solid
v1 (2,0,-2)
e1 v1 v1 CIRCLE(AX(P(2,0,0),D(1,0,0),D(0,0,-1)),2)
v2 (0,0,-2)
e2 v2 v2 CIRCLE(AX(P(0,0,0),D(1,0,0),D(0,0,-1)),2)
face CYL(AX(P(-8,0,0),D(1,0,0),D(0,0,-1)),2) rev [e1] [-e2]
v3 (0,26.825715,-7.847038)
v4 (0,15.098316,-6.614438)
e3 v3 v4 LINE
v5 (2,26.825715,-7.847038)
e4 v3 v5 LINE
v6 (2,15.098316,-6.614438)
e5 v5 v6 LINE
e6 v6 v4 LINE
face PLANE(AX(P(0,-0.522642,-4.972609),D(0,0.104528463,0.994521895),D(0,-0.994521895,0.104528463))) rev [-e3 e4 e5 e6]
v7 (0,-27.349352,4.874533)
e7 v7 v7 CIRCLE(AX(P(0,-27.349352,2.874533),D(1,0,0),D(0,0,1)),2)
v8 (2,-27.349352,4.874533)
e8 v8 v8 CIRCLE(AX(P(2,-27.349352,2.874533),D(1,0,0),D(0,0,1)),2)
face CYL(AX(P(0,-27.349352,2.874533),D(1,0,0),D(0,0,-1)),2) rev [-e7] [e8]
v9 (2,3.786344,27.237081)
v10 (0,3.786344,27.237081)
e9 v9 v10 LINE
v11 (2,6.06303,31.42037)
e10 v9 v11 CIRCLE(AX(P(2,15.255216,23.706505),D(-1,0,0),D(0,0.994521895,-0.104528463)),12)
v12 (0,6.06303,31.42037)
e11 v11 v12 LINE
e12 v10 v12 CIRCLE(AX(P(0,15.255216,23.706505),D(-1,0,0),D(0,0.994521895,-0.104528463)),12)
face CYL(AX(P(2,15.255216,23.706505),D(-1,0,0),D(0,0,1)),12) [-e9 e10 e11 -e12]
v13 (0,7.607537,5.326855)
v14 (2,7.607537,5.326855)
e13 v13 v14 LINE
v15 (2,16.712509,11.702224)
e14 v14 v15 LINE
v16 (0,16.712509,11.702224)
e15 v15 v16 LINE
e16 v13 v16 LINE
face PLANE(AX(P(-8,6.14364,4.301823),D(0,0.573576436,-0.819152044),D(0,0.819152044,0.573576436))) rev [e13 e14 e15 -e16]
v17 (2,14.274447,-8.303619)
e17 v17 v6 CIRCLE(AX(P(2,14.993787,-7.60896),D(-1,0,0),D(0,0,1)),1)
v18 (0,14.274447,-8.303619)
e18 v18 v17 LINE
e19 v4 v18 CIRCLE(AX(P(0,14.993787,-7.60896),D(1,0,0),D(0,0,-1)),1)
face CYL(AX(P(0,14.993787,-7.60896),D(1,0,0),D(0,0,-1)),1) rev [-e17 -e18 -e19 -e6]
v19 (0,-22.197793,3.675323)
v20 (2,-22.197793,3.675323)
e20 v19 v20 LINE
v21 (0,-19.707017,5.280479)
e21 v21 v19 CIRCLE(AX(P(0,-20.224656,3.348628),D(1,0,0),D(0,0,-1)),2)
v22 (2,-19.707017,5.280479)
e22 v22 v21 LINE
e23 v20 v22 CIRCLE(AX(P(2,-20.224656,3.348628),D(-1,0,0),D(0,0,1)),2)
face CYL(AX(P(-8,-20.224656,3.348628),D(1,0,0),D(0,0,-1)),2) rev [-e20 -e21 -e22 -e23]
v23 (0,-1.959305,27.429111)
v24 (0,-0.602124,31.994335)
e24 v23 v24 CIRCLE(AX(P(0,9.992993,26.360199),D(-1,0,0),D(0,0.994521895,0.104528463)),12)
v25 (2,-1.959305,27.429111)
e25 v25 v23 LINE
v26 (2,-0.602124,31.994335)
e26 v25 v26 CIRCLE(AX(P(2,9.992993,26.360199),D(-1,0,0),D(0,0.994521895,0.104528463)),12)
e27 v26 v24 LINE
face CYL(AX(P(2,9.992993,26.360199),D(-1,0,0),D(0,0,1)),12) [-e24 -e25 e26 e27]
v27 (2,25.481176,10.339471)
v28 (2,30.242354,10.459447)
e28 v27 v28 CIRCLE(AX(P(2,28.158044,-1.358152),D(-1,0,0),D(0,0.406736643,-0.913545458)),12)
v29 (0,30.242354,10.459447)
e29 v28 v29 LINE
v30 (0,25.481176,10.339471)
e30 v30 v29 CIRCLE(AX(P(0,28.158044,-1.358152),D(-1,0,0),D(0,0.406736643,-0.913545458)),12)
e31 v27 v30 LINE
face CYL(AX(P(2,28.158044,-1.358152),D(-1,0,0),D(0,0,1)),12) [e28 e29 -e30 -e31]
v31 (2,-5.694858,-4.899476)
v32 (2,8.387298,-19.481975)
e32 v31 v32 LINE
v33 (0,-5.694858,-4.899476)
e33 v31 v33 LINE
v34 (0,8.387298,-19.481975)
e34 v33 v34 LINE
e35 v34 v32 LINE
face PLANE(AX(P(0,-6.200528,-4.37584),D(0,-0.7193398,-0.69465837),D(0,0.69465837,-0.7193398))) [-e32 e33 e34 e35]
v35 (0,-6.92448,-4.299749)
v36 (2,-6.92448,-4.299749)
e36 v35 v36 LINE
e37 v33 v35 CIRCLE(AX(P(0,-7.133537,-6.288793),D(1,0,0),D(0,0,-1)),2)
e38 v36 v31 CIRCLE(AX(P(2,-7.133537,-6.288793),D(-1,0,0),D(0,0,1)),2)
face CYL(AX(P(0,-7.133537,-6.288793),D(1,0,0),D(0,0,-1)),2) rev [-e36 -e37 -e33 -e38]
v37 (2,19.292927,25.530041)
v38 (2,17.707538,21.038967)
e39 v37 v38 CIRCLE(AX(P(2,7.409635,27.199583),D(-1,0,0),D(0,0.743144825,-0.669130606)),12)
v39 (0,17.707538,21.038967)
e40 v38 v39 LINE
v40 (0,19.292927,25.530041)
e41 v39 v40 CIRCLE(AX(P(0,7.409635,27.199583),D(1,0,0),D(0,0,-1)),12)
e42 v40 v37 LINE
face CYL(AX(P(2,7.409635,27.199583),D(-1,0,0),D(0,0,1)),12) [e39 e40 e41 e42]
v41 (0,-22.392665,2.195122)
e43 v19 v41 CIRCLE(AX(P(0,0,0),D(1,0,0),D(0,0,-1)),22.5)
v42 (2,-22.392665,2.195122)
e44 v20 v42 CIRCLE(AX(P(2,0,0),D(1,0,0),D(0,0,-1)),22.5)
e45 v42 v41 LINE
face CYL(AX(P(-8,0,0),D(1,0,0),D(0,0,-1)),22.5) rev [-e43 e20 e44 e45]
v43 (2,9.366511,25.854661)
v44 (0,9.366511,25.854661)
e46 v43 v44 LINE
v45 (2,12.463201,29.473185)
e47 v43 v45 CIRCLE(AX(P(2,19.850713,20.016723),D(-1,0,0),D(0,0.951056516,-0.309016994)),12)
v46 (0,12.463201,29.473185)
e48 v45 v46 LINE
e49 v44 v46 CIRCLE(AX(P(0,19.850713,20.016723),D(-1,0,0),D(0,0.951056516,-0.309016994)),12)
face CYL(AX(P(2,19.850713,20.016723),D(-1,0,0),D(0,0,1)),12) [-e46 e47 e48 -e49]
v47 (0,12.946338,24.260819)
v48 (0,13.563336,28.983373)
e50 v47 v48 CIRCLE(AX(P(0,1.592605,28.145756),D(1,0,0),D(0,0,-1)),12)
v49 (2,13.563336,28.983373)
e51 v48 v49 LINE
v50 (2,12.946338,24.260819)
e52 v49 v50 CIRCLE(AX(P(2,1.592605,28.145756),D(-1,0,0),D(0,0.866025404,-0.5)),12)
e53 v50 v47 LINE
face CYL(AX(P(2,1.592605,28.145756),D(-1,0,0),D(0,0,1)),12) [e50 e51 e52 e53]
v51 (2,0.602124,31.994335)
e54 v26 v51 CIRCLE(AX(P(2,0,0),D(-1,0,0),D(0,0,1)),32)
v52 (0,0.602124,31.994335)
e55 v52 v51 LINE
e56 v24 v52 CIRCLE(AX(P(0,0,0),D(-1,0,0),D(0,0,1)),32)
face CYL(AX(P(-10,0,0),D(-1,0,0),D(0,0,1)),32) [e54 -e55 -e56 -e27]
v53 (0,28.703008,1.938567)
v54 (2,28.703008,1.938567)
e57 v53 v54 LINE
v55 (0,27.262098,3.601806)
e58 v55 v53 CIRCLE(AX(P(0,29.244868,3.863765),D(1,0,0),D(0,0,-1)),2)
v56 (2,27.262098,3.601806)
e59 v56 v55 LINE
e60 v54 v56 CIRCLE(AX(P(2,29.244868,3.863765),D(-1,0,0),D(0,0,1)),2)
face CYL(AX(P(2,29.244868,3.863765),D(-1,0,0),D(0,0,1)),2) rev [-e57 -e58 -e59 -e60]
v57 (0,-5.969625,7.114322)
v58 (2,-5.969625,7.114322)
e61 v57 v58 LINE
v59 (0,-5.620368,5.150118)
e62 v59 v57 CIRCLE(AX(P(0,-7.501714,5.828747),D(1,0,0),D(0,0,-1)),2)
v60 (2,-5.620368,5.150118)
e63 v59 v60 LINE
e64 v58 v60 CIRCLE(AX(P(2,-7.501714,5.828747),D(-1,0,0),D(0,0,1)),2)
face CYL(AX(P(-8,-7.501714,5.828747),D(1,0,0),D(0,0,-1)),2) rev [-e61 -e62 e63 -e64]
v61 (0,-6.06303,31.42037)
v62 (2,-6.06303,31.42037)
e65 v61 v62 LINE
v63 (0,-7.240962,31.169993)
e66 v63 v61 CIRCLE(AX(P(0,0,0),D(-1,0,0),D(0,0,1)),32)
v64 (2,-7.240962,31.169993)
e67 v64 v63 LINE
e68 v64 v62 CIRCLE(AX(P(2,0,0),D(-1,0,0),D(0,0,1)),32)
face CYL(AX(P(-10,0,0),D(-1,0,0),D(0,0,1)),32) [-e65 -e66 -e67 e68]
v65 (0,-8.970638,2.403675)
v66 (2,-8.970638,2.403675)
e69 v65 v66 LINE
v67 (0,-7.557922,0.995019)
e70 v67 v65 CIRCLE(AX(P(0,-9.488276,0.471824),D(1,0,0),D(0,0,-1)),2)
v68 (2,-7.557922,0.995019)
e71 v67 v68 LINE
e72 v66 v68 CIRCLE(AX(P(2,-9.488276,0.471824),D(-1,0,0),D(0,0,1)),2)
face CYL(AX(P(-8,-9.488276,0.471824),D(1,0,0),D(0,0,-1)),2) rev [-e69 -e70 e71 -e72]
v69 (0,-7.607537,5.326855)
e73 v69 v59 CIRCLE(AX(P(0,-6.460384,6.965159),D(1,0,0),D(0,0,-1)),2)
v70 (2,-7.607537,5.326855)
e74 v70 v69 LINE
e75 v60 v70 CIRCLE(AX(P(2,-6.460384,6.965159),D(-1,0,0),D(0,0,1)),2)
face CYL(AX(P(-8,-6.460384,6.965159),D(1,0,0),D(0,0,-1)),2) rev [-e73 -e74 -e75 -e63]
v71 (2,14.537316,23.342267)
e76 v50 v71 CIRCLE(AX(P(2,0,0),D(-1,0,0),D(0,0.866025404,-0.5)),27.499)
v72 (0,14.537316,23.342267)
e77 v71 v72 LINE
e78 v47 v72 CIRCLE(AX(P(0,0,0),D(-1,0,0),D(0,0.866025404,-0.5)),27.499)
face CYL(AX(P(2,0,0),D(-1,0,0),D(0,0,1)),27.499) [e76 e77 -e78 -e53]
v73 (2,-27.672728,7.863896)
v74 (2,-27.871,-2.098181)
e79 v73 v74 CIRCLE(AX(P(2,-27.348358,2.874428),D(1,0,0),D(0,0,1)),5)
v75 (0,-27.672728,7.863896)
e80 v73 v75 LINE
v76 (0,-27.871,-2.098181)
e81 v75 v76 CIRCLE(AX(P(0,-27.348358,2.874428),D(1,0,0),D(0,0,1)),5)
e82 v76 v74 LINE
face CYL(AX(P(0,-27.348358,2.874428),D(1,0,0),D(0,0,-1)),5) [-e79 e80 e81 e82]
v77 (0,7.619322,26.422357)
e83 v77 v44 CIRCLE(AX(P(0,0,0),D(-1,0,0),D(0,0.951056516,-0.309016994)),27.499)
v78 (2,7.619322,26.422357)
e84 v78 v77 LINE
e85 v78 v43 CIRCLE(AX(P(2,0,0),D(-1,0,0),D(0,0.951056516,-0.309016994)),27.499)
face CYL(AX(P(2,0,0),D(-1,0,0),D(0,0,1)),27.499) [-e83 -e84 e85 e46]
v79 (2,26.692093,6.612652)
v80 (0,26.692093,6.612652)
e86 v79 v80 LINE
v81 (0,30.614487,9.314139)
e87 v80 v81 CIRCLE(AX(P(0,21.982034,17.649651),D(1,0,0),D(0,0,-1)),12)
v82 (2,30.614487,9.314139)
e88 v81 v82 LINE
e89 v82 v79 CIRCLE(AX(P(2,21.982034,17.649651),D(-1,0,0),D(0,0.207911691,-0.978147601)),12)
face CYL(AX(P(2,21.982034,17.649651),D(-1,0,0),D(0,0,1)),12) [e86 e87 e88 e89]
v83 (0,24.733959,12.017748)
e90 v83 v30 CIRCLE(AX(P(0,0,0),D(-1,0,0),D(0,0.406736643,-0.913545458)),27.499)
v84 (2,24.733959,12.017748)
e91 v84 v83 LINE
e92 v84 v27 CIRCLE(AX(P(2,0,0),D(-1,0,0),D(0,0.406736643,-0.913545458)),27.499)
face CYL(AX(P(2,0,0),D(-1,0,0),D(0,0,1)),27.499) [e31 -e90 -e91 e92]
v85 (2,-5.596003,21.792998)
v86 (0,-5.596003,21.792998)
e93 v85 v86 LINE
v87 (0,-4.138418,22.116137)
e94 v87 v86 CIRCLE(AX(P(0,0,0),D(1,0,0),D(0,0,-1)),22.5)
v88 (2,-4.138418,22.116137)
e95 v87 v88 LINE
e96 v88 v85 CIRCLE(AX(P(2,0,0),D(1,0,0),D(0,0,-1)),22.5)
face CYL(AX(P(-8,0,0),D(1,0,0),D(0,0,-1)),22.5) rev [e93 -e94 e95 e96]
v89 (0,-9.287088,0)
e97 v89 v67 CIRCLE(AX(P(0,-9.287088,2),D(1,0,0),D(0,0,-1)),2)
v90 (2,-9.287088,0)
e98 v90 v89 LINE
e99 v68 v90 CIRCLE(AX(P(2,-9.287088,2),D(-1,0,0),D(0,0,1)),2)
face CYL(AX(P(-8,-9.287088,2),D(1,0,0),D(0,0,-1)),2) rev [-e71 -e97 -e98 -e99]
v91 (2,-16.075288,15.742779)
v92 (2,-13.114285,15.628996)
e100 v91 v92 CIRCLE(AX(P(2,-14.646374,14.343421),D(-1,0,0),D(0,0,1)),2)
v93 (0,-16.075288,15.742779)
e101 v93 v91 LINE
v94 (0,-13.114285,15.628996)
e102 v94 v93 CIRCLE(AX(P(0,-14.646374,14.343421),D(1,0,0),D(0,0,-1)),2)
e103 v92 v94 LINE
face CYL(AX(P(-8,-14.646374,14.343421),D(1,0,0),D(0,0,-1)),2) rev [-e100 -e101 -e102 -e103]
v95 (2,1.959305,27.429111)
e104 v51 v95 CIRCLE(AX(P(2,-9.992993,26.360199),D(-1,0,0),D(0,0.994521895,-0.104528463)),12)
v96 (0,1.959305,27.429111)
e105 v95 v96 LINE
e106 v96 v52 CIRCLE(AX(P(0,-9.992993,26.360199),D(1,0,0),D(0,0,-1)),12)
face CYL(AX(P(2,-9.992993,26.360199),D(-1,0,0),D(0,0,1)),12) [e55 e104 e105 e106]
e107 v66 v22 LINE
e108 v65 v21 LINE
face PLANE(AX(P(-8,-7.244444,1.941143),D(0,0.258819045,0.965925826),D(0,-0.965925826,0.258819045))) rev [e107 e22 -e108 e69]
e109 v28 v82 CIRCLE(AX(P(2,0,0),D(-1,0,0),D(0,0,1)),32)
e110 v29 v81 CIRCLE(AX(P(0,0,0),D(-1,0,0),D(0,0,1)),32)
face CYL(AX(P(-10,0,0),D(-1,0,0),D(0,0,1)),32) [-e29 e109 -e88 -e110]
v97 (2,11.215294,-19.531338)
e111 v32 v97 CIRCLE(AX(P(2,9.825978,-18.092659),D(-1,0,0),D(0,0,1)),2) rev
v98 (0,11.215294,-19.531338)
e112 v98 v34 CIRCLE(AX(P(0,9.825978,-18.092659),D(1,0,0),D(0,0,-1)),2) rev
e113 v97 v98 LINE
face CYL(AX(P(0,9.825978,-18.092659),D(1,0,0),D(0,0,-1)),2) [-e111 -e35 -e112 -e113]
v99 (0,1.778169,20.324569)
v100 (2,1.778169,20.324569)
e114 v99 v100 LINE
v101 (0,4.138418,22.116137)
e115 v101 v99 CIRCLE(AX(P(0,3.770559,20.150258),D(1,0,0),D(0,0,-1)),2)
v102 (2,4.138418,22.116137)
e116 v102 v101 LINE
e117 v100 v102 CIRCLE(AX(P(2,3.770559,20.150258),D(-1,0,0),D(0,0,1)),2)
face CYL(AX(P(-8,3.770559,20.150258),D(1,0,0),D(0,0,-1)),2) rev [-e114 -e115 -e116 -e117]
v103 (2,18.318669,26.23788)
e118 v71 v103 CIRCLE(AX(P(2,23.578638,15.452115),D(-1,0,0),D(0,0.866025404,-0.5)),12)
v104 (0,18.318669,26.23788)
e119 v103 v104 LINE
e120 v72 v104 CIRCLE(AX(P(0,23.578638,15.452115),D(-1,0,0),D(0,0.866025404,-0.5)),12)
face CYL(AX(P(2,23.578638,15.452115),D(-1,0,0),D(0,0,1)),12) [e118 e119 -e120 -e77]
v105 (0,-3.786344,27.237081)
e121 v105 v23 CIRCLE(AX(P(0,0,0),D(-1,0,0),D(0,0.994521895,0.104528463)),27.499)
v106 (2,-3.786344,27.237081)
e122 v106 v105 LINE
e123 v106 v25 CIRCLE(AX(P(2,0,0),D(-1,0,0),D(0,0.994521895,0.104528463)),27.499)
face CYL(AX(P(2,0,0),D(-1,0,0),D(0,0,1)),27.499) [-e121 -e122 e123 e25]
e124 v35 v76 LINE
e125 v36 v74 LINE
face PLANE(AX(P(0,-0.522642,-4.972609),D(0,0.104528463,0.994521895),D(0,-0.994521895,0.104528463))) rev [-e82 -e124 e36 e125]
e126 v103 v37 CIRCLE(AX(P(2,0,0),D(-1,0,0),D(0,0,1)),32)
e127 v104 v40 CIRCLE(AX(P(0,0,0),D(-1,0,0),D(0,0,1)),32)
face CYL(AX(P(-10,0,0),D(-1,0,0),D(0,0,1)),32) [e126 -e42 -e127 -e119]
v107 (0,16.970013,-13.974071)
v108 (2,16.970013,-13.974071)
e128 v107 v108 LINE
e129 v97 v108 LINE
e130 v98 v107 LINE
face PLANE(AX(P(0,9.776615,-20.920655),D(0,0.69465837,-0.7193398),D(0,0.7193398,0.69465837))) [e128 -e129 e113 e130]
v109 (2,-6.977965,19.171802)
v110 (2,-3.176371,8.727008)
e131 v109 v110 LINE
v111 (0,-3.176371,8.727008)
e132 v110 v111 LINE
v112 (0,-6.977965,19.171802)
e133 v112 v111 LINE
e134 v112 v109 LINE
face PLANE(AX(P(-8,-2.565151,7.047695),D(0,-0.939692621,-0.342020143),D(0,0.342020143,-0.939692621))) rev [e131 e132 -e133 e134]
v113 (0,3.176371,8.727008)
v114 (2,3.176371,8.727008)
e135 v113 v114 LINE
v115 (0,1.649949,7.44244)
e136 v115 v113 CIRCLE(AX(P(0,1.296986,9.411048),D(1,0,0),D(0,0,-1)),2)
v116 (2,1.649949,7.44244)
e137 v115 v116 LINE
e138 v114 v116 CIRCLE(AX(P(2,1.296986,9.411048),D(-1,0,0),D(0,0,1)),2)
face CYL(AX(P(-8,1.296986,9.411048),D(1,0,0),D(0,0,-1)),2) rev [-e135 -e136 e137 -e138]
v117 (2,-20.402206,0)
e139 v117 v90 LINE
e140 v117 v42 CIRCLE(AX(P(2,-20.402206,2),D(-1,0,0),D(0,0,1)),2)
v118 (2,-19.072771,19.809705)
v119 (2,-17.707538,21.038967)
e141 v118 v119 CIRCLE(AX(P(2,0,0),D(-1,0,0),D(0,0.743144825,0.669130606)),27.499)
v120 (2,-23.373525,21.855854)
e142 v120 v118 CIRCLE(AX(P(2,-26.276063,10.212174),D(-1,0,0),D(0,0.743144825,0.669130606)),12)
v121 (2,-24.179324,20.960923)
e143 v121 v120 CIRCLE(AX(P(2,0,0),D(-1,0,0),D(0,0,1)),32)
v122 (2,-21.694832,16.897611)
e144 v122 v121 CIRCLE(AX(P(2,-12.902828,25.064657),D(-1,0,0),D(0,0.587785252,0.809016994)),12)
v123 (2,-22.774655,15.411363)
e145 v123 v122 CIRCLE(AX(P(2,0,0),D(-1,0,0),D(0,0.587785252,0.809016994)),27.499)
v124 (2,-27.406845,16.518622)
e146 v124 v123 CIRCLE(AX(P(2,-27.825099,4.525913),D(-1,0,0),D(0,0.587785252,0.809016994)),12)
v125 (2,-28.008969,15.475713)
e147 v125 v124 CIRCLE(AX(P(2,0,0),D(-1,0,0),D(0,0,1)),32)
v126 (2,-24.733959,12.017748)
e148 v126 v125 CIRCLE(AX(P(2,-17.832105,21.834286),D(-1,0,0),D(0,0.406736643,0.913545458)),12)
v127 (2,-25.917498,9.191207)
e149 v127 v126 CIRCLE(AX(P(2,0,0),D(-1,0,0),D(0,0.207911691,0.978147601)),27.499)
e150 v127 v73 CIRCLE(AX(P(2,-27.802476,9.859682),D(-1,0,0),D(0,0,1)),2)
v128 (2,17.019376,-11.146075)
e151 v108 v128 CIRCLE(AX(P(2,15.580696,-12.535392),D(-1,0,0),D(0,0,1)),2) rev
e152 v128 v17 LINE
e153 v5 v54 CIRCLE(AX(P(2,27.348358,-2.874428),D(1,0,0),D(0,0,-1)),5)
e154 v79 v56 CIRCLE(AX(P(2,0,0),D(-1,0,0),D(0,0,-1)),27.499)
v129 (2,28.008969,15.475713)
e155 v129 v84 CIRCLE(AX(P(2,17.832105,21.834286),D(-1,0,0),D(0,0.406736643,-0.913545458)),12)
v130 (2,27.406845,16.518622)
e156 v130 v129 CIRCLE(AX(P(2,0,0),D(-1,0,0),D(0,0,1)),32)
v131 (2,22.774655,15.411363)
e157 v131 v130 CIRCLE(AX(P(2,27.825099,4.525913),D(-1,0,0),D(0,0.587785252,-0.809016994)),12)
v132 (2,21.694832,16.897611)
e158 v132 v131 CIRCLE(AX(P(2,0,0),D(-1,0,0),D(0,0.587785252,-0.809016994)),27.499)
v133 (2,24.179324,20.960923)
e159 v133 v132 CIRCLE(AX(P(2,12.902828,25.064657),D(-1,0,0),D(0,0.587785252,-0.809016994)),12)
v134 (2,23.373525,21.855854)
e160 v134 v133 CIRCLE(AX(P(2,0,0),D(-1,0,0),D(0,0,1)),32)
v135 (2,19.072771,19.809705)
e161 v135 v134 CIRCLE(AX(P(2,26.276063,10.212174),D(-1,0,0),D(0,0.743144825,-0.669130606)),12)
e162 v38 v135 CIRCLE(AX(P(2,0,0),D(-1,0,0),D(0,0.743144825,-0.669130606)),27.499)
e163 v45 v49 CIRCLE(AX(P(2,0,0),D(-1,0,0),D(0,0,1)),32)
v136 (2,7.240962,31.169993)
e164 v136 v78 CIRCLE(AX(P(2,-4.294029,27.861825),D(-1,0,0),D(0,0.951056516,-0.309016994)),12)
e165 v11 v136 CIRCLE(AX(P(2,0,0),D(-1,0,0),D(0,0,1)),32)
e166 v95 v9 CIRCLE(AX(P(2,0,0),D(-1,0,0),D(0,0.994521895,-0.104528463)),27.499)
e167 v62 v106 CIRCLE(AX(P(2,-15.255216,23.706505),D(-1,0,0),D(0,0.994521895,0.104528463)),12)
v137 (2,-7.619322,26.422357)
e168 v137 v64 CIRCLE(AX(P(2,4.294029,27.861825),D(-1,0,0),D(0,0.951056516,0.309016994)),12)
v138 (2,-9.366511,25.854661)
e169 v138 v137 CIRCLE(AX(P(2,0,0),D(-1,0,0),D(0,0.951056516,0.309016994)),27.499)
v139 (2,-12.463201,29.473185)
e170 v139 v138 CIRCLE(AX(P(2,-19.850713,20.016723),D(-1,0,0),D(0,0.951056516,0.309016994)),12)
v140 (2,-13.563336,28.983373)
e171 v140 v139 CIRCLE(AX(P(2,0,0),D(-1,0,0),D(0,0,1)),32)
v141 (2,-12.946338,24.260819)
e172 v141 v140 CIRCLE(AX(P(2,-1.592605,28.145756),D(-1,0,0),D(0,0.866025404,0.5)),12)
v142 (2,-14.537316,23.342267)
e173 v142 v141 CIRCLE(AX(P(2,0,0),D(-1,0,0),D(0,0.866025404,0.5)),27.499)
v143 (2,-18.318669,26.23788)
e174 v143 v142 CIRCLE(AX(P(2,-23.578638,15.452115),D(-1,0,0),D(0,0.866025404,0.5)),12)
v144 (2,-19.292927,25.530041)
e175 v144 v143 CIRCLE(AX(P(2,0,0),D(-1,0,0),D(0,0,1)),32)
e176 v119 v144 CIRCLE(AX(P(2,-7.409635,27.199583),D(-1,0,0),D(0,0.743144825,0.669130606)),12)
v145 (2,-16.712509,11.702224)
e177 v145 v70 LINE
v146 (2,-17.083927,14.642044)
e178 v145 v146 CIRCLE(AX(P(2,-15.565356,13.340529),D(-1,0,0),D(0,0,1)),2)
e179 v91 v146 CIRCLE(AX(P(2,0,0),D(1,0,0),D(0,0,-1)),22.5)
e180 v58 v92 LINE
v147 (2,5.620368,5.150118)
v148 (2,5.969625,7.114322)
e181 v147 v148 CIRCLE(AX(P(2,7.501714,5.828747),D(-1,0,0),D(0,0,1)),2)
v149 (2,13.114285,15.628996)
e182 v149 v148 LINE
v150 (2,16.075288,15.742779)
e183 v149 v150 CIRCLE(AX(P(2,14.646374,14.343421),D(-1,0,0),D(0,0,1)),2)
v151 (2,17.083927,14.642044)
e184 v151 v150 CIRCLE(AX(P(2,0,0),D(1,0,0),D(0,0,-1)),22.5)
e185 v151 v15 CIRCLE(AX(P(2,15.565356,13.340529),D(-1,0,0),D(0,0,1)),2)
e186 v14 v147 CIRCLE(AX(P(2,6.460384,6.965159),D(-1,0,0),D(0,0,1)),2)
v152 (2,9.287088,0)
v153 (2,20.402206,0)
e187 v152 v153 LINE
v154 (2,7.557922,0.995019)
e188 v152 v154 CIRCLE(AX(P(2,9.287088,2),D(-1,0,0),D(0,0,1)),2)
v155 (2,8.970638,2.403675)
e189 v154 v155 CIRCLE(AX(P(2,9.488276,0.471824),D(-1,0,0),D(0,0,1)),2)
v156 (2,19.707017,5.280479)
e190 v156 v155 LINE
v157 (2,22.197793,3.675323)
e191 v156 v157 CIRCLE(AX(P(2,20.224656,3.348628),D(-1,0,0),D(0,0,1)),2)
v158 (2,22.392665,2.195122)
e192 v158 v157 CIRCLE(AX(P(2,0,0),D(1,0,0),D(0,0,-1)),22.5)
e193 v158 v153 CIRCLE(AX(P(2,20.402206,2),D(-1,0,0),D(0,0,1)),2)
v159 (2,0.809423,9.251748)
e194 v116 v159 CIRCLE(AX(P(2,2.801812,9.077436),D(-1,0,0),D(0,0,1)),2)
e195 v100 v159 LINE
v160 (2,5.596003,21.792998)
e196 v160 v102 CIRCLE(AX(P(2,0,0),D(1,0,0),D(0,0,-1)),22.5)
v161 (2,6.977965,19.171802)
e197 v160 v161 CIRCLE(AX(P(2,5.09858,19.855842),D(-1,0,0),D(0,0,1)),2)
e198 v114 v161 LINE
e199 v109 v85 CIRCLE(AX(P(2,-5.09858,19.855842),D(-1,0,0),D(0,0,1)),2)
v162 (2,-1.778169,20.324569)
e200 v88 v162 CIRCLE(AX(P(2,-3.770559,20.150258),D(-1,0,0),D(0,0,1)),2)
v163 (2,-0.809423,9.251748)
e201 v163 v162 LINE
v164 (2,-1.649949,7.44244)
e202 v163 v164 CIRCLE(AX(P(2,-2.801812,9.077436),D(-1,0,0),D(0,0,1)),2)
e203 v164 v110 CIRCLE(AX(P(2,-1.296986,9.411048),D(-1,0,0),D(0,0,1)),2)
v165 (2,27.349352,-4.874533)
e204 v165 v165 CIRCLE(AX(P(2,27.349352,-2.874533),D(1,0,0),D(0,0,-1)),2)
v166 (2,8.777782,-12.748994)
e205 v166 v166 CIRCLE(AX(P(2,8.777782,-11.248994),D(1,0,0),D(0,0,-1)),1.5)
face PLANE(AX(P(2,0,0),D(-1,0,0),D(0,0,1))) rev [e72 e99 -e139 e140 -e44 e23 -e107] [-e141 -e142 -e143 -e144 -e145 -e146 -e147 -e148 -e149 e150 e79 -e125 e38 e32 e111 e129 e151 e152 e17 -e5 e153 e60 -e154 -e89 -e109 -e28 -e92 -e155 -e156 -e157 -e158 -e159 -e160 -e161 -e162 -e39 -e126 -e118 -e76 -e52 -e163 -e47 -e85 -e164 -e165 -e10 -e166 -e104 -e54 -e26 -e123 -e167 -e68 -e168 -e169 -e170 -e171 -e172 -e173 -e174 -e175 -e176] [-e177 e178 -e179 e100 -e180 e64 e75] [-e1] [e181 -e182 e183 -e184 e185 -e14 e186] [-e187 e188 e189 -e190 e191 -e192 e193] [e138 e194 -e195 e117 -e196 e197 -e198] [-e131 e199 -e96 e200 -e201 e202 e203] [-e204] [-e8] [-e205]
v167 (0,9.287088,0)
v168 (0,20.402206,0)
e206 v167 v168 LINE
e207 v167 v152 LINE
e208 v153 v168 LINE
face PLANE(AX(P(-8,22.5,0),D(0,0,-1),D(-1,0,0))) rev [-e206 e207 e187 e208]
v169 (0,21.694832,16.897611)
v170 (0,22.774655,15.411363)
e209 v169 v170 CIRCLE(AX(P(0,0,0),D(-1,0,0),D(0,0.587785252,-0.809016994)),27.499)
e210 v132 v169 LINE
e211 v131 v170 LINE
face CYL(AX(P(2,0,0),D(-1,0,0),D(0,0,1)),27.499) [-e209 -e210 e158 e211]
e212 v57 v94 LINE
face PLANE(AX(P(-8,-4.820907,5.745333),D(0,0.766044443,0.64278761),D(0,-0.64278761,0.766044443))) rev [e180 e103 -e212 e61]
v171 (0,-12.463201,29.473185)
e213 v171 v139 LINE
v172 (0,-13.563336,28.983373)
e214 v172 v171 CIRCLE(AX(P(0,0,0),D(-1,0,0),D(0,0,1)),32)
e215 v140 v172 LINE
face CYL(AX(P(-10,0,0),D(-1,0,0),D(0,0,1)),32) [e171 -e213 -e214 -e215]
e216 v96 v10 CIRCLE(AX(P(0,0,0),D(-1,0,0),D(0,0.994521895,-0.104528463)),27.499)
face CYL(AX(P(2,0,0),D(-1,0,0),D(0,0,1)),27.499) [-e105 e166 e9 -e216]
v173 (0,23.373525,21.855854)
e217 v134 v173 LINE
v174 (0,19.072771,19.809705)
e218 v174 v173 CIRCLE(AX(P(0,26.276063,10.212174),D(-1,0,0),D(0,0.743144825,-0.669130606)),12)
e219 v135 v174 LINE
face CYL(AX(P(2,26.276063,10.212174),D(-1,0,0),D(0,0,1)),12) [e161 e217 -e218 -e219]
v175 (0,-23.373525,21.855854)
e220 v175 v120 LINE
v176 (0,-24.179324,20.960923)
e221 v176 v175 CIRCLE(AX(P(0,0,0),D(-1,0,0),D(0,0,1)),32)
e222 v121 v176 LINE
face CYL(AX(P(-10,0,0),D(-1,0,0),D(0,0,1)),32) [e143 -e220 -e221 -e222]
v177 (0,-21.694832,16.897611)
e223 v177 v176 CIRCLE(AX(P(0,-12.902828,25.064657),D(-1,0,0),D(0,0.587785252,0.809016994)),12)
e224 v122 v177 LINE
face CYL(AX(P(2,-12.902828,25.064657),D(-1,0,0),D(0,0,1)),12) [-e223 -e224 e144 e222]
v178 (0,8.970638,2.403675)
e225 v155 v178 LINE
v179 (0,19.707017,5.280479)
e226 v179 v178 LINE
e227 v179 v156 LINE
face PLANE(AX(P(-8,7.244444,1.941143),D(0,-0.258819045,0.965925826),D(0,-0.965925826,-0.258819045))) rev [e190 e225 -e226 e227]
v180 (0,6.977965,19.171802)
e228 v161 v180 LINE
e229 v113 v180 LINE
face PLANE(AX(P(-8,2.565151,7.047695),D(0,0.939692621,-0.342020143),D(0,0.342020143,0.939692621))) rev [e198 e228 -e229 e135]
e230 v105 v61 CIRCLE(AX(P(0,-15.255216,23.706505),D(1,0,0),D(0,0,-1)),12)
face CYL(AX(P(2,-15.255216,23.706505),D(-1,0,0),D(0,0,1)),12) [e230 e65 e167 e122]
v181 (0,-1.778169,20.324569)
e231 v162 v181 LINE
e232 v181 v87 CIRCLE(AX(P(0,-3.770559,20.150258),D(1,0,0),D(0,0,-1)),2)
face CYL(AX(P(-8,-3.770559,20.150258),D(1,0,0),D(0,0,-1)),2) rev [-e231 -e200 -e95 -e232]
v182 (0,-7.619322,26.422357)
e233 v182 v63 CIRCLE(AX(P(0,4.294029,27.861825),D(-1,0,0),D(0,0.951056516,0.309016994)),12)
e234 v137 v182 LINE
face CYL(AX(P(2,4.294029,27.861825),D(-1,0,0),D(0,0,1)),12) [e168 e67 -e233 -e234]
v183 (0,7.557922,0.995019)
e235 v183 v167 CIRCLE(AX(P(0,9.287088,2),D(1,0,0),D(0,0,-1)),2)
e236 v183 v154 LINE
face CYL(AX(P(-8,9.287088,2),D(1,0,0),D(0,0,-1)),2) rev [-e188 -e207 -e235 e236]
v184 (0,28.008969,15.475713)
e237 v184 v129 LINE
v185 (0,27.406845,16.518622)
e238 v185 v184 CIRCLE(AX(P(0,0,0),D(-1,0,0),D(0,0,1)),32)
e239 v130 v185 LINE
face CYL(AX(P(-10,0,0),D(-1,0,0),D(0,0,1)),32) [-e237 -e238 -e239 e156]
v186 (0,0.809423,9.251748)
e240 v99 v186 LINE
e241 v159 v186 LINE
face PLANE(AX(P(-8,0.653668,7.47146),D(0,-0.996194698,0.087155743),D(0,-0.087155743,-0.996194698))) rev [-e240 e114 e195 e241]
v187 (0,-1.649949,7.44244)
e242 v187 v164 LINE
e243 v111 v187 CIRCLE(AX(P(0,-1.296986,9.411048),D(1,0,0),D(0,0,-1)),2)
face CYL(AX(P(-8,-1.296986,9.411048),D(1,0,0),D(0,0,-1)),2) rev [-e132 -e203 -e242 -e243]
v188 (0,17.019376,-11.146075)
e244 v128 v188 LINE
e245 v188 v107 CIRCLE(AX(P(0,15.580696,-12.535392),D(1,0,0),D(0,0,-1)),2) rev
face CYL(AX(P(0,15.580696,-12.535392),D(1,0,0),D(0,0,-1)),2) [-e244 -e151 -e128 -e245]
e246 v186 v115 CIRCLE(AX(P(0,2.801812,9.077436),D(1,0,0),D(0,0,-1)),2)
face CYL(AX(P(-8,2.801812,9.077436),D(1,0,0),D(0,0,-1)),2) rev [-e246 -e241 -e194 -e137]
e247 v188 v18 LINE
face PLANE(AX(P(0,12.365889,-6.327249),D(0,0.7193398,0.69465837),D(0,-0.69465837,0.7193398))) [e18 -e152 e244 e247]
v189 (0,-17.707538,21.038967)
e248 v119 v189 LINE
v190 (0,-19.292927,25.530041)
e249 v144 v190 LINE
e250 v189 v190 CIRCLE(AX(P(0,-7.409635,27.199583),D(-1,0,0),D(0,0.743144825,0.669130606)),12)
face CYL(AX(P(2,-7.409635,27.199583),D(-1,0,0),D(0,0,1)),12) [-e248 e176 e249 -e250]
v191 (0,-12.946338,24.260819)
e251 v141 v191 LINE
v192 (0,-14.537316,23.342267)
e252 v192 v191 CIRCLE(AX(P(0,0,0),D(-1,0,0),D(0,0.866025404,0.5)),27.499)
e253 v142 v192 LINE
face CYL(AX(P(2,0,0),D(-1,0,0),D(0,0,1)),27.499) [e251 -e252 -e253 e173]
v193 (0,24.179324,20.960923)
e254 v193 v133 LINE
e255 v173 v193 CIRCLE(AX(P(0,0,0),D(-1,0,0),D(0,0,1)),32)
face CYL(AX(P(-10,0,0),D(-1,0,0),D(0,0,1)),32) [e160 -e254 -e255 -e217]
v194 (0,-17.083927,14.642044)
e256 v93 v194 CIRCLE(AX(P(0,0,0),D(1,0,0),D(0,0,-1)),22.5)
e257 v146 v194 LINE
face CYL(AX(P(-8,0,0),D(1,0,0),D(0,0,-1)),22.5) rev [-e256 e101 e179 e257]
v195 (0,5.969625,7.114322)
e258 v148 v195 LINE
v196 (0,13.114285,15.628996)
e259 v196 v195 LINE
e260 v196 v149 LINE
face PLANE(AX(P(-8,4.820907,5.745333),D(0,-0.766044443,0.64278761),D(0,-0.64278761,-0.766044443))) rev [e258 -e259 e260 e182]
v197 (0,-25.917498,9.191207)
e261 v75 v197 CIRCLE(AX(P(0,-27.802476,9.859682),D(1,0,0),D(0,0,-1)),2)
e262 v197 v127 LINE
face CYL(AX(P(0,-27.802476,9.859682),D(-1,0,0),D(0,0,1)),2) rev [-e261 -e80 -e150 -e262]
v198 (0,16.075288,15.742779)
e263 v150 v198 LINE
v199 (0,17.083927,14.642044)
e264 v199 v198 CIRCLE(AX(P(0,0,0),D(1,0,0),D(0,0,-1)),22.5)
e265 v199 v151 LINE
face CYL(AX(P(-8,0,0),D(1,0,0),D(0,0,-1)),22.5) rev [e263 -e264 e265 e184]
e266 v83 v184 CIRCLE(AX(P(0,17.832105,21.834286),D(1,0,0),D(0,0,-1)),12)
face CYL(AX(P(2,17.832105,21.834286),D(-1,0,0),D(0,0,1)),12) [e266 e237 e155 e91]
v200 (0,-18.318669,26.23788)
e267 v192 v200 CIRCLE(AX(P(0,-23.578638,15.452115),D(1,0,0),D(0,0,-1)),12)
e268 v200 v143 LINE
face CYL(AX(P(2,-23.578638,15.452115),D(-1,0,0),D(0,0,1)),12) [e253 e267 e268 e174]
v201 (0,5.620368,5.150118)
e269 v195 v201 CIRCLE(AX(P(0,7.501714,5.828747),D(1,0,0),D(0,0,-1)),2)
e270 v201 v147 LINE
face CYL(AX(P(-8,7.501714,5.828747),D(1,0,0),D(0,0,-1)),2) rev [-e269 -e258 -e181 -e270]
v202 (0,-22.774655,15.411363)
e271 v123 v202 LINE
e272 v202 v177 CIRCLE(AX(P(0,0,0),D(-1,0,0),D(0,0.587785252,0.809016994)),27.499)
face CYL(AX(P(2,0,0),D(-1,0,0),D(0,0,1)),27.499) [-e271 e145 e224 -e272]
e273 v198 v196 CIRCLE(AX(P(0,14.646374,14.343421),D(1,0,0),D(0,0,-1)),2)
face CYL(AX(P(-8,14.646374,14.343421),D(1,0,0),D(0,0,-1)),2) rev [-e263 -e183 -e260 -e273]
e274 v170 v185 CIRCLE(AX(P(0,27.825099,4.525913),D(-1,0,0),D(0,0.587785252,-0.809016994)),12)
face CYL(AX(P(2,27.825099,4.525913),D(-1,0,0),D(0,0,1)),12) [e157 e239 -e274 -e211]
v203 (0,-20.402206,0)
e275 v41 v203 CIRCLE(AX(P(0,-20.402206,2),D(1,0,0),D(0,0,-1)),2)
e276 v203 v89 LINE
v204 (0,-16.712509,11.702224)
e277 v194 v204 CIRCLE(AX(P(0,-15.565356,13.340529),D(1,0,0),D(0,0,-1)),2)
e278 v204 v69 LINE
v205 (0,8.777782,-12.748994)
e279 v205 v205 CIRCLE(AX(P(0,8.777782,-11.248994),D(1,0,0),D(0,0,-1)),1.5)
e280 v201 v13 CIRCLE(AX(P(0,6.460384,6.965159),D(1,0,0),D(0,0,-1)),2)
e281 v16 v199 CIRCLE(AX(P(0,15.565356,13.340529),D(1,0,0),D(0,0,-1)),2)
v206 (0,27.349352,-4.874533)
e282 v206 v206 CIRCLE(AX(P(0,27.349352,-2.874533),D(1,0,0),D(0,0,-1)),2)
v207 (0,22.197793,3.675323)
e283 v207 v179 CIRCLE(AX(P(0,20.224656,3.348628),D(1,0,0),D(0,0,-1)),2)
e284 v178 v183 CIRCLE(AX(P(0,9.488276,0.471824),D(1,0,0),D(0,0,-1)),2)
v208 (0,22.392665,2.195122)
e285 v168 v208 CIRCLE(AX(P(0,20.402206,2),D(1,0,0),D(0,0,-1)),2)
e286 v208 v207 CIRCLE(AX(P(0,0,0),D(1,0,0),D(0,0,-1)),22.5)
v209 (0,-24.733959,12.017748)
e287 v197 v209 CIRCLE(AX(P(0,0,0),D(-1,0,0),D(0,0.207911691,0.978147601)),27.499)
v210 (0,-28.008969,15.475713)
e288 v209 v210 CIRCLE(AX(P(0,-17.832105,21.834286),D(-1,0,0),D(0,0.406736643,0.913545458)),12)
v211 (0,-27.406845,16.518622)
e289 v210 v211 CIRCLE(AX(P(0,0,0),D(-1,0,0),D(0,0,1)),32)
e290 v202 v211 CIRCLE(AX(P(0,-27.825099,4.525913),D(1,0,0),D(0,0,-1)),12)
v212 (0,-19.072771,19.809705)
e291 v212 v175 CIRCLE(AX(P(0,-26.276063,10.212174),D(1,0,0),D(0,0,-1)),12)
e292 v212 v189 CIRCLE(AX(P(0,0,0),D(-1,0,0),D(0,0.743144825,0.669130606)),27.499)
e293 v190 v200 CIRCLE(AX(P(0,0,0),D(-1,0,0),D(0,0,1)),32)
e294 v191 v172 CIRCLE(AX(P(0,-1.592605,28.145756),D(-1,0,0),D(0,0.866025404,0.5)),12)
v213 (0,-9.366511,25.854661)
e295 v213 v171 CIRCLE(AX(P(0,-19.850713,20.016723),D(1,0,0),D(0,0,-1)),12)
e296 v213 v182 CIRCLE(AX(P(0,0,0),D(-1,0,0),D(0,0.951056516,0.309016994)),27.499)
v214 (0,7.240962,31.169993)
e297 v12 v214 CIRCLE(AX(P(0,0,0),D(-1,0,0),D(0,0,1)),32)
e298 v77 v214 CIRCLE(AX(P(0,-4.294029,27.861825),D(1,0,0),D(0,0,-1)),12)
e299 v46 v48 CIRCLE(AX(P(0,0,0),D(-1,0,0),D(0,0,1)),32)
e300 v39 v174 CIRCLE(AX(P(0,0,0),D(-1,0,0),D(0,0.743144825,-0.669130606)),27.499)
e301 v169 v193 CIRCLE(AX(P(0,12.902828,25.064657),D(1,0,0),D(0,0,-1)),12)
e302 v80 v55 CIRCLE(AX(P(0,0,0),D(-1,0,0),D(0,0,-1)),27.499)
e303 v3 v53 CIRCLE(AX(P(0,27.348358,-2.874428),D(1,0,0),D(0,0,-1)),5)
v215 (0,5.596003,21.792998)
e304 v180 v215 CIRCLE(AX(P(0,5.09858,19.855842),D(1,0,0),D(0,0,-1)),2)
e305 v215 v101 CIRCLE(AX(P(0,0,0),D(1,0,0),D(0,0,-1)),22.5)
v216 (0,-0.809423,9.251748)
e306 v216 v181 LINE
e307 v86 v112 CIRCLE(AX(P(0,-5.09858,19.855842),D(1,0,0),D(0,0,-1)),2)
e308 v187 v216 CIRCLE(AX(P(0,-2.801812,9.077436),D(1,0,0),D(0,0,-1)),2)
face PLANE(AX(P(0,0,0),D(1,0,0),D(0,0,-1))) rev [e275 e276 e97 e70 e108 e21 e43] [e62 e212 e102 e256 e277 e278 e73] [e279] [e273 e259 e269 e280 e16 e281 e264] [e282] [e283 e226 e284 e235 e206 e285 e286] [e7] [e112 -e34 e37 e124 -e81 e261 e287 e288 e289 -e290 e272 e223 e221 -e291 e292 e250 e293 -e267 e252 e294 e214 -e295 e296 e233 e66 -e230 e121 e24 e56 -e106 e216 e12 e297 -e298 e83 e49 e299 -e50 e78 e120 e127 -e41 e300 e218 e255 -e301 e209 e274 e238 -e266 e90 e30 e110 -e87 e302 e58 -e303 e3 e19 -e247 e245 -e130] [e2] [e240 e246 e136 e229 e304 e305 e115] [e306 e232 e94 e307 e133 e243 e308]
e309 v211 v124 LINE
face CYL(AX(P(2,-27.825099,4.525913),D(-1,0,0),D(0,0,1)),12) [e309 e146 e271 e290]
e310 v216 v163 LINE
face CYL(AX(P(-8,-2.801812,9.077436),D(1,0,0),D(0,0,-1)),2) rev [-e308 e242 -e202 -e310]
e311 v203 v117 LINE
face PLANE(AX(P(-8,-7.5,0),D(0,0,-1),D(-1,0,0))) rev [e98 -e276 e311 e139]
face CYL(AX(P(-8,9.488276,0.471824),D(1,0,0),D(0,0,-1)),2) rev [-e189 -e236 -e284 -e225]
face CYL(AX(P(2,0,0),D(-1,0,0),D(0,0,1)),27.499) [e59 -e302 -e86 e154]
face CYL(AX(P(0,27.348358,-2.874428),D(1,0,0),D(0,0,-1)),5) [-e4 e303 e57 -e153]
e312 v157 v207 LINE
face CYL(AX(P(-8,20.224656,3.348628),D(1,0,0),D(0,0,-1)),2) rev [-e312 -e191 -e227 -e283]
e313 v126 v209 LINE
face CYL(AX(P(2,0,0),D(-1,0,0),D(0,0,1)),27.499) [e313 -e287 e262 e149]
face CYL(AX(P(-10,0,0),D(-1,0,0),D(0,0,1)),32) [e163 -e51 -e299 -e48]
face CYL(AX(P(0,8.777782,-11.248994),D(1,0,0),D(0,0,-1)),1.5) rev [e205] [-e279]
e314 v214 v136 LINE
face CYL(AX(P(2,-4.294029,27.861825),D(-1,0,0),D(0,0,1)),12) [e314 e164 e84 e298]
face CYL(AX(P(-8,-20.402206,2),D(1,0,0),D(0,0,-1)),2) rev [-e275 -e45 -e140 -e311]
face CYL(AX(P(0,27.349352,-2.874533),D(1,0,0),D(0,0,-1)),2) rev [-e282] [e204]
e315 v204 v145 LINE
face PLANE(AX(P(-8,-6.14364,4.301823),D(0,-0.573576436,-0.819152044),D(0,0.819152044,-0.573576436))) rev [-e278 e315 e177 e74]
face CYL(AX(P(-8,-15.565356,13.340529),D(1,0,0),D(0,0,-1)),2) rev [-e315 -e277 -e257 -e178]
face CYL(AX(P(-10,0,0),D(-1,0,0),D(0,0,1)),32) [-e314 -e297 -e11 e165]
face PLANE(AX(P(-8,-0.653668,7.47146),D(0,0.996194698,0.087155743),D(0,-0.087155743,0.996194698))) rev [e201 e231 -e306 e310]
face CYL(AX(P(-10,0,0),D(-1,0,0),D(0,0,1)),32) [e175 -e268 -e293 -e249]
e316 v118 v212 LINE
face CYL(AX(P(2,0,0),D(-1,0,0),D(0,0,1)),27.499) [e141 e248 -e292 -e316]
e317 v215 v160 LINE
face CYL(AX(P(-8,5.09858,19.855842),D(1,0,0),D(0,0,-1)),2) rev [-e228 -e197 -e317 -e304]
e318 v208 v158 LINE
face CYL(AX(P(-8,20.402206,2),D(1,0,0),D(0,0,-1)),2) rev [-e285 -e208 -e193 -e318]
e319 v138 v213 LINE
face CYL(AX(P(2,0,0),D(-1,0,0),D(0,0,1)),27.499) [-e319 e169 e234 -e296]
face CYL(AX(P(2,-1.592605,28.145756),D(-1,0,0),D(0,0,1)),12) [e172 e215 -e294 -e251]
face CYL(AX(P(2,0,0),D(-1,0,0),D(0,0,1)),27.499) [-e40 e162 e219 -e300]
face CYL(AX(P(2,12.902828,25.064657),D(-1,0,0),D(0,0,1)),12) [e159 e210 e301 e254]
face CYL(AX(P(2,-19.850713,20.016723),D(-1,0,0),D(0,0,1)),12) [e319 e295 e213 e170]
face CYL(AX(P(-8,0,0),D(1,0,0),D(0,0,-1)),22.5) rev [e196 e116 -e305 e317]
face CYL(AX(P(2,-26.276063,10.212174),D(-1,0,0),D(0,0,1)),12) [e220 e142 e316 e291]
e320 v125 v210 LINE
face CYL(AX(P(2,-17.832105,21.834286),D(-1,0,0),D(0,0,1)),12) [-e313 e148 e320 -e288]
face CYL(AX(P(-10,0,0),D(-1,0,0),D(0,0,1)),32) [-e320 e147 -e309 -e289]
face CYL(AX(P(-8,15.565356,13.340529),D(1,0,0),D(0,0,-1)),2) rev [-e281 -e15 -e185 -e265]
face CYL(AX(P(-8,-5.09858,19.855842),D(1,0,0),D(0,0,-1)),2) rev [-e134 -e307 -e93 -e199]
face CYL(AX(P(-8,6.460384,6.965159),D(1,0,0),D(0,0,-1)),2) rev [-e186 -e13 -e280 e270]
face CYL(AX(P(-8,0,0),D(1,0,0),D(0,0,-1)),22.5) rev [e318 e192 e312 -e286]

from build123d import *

# Parameters (mm, degrees)
BASPROSKE_W         = 2
BASPROSKE_H         = 32
TOOTHCUT_DEPTH      = 46.299006612
TEETHCUTS_COUNT     = 30
TEETHCUTS_ANGLE     = 348
BORSKE_R            = 0.4
BORE_DEPTH          = 50.0000508
CUT_EXTRUDE_1_DEPTH = 10
CUT_EXTRUDE_3_DEPTH = 46.215730311
EXTRUDE_1_DEPTH     = 2
SKETCH_5_R          = 2
CUT_EXTRUDE_4_DEPTH = 10
EXTRUDE_START       = -2
EXTRUDE_2_DEPTH     = 2
SKETCH_8_R          = 2
CUT_EXTRUDE_6_DEPTH = 2
SKETCH_9_R          = 1.5
EXTRUDE_3_DEPTH     = 2
FILLET_7_R          = 2
CUT_EXTRUDE_7_DEPTH = 10
FILLET_8_R          = 2
FILLET_9_R          = 1


with BuildPart() as part:
    # BasProSke → Base-Revolve (revolve)
    with BuildSketch(Plane(origin=(0, 0, 0), x_dir=(1, 0, 0), z_dir=(0, 1, 0)), mode=Mode.PRIVATE) as base_revolve_sk:
        with Locations((1, 16)):
            Rectangle(BASPROSKE_W, BASPROSKE_H)
    revolve(base_revolve_sk.sketch.rotate(Axis((-10, 0, 0), (1, 0, 0)), 180), axis=Axis((-10, 0, 0), (1, 0, 0)))

    # TooCutSke → ToothCut (cut, through all)
    with BuildSketch(Plane(origin=(0, 0, 0), x_dir=(0, 0, -1), z_dir=(1, 0, 0))):
        with BuildLine():
            ThreePointArc((0.918551563, 27.483654488), (0, 27.499), (-0.918551563, 27.483654488))
            ThreePointArc((-0.918551563, 27.483654488), (-1.617208176, 29.787801627), (-2.761784709, 31.906093311))
            ThreePointArc((-2.761784709, 31.906093311), (0, 32.0254), (2.761784709, 31.906093311))
            ThreePointArc((2.761784709, 31.906093311), (1.617208176, 29.787801627), (0.918551563, 27.483654488))
        make_face()
    toothcut = extrude(amount=TOOTHCUT_DEPTH, mode=Mode.SUBTRACT)

    # TeethCuts: ToothCut ×30 about axis
    teethcuts_axis = Axis((-10, 0, 0), (1, 0, 0))
    for i in range(1, TEETHCUTS_COUNT):
        add(toothcut.rotate(teethcuts_axis, i * TEETHCUTS_ANGLE / (TEETHCUTS_COUNT - 1)), mode=Mode.SUBTRACT)

    # BorSke → Bore (cut, symmetric)
    with BuildSketch(Plane(origin=(0, 0, 0), x_dir=(0, 0, -1), z_dir=(1, 0, 0))):
        with Locations(Location((0, 0, 0), (0, 0, 180))):
            Circle(BORSKE_R)
    extrude(amount=BORE_DEPTH, both=True, mode=Mode.SUBTRACT)

    # 草图1 → 切除-拉伸1 (cut)
    with BuildSketch(Plane(origin=(2, 0, 0), x_dir=(0, 0, -1), z_dir=(1, 0, 0))):
        Polygon((3.344910825, 31.824700652), (-3.960111671, -37.677945718), (64.810502564, -34.553326749), (47.008100667, 53.868547869), (5.993727235, 38.229973826), align=None)
    extrude(amount=-CUT_EXTRUDE_1_DEPTH, mode=Mode.SUBTRACT)

    # 草图2 → 切除-拉伸3 (cut, through all)
    with BuildSketch(Plane(origin=(2, 0, 0), x_dir=(0, 0, -1), z_dir=(1, 0, 0))):
        with BuildLine():
            Line((4.939512658, 27.051732213), (6.979218814, 36.725980442))
            Line((6.979218814, 36.725980442), (-6.447162529, 36.725980442))
            Line((-6.447162529, 36.725980442), (-5.501449664, 26.943070586))
            ThreePointArc((-5.501449664, 26.943070586), (-0.286173264, 27.497510903), (4.939512658, 27.051732213))
        make_face()
        with BuildLine():
            Line((-11.106203944, -25.156455135), (-12.164876938, -35.534369935))
            Line((-12.164876938, -35.534369935), (-0.063712698, -31.064954068))
            Line((-0.063712698, -31.064954068), (0, -27.499))
            ThreePointArc((0, -27.499), (-5.675281546, -26.906991292), (-11.106203944, -25.156455135))
        make_face()
    extrude(amount=-CUT_EXTRUDE_3_DEPTH, mode=Mode.SUBTRACT)

    # 草图4 → 凸台-拉伸1 (add)
    with BuildSketch(Plane(origin=(2, 0, 0), x_dir=(0, 0, -1), z_dir=(1, 0, 0))):
        Polygon((2.874428211, 27.348357601), (-2.874428211, -27.348357601), (2.098181265, -27.870999917), (7.847037688, 26.825715284), align=None)
    extrude(amount=-EXTRUDE_1_DEPTH)

    # 草图5 → 切除-拉伸4 (cut)
    with BuildSketch(Plane(origin=(2, 0, 0), x_dir=(0, 0, -1), z_dir=(1, 0, 0))):
        Circle(SKETCH_5_R)
    extrude(amount=-CUT_EXTRUDE_4_DEPTH, mode=Mode.SUBTRACT)

    # 草图6 → 凸台-拉伸2 (add)
    with BuildSketch(Plane(origin=(2, 0, 0), x_dir=(0, 0, -1), z_dir=(1, 0, 0)).offset(EXTRUDE_START)):
        with BuildLine():
            Line((2.874428211, 27.348357601), (7.847037688, 26.825715284))
            ThreePointArc((7.847037688, 26.825715284), (3.170258871, 32.33959835), (-2.125103827, 27.416763754))
            ThreePointArc((-2.125103827, 27.416763754), (0.37622016, 27.496426302), (2.874428211, 27.348357601))
        make_face()
        with BuildLine():
            Line((-2.874428211, -27.348357601), (2.098181265, -27.870999917))
            ThreePointArc((2.098181265, -27.870999917), (-3.622799465, -32.292034417), (-7.778930918, -26.375807756))
            ThreePointArc((-7.778930918, -26.375807756), (-5.348829637, -26.973783986), (-2.874428211, -27.348357601))
        make_face()
    extrude(amount=EXTRUDE_2_DEPTH)

    # 草图8 → 切除-拉伸6 (cut)
    with BuildSketch(Plane(origin=(2, 0, 0), x_dir=(0, 0, -1), z_dir=(1, 0, 0))):
        with Locations((2.87453274, 27.349352123)):
            Circle(SKETCH_8_R)
        with Locations(Location((-2.87453274, -27.349352123, 0), (0, 0, 180))):
            Circle(SKETCH_8_R)
    extrude(amount=-CUT_EXTRUDE_6_DEPTH, mode=Mode.SUBTRACT)

    # 草图9 → 凸台-拉伸3 (add)
    with BuildSketch(Plane(origin=(2, 0, 0), x_dir=(0, 0, -1), z_dir=(1, 0, 0))):
        Polygon((4.375839678, -6.200527675), (20.920655086, 9.776614846), (12.584754641, 18.40869245), (6.327248729, 12.365889233), align=None)
        with Locations((11.248994031, 8.777781877)):
            Circle(SKETCH_9_R, mode=Mode.SUBTRACT)
    extrude(amount=-EXTRUDE_3_DEPTH)

    # 圆角7
    fillet_7_edges = [part.edges().sort_by_distance(p)[0] for p in [
        (1, 27.416763754, 2.125103827),
        (1, -26.375807756, 7.778930918),
        (1, -6.200527675, -4.375839678),
        (1, 18.40869245, -12.584754641),
        (1, 9.776614846, -20.920655086),
    ]]
    fillet(fillet_7_edges, radius=FILLET_7_R)

    # 草图10 → 切除-拉伸7 (cut)
    with BuildSketch(Plane(origin=(2, 0, 0), x_dir=(0, 0, -1), z_dir=(1, 0, 0))):
        with BuildLine():
            Line((0, 22.5), (0, 7.5))
            ThreePointArc((0, 7.5), (-0.978946442, 7.43583646), (-1.941142838, 7.244443697))
            Line((-1.941142838, 7.244443697), (-5.823428515, 21.733331092))
            ThreePointArc((-5.823428515, 21.733331092), (-2.936839325, 22.307509381), (0, 22.5))
        make_face()
        with BuildLine():
            Line((-1.941142838, -7.244443697), (-5.823428515, -21.733331092))
            ThreePointArc((-5.823428515, -21.733331092), (-2.936839325, -22.307509381), (0, -22.5))
            Line((0, -22.5), (0, -7.5))
            ThreePointArc((0, -7.5), (-0.978946442, -7.43583646), (-1.941142838, -7.244443697))
        make_face()
        with BuildLine():
            Line((-4.301823273, -6.143640332), (-12.905469818, -18.430920997))
            ThreePointArc((-12.905469818, -18.430920997), (-15.200779671, -16.588740078), (-17.23599997, -14.462721218))
            Line((-17.23599997, -14.462721218), (-5.745333323, -4.820907073))
            ThreePointArc((-5.745333323, -4.820907073), (-5.066926557, -5.529580026), (-4.301823273, -6.143640332))
        make_face()
        with BuildLine():
            Line((-7.047694656, -2.565151075), (-21.143083968, -7.695453225))
            ThreePointArc((-21.143083968, -7.695453225), (-21.96666016, -4.869891314), (-22.414380707, -1.961004212))
            Line((-22.414380707, -1.961004212), (-7.471460236, -0.653668071))
            ThreePointArc((-7.471460236, -0.653668071), (-7.322220053, -1.623297105), (-7.047694656, -2.565151075))
        make_face()
        with BuildLine():
            Line((-7.471460236, 0.653668071), (-22.414380707, 1.961004212))
            ThreePointArc((-22.414380707, 1.961004212), (-21.96666016, 4.869891314), (-21.143083968, 7.695453225))
            Line((-21.143083968, 7.695453225), (-7.047694656, 2.565151075))
            ThreePointArc((-7.047694656, 2.565151075), (-7.322220053, 1.623297105), (-7.471460236, 0.653668071))
        make_face()
        with BuildLine():
            Line((-5.745333323, 4.820907073), (-17.23599997, 14.462721218))
            ThreePointArc((-17.23599997, 14.462721218), (-15.200779671, 16.588740078), (-12.905469818, 18.430920997))
            Line((-12.905469818, 18.430920997), (-4.301823273, 6.143640332))
            ThreePointArc((-4.301823273, 6.143640332), (-5.066926557, 5.529580026), (-5.745333323, 4.820907073))
        make_face()
    extrude(amount=-CUT_EXTRUDE_7_DEPTH, mode=Mode.SUBTRACT)

    # 圆角8
    # the kernel refuses this fillet: 2 mm, written as the material it adds along each edge
    with BuildSketch(Plane(origin=(2, 21.733331092, 5.823428515), x_dir=(0, -0.9659258262890681, -0.2588190451025213), z_dir=(-1, 0, 0)), Plane(origin=(2, -7.695453225, 21.143083968), x_dir=(0, 0.3420201433256658, -0.9396926207859094), z_dir=(-1, 0, 0)), Plane(origin=(2, -18.430920997, 12.905469818), x_dir=(0, 0.8191520442889906, -0.5735764363510477), z_dir=(-1, 0, 0)), Plane(origin=(2, -22.5, 0), x_dir=(0, 1, 0), z_dir=(-1, 0, 0)), Plane(origin=(2, 14.462721218, 17.23599997), x_dir=(0, -0.6427876096865373, -0.7660444431189798), z_dir=(-1, 0, 0))) as fillet_8_piece_1:
        with BuildLine():
            CenterArc((2.097794237, -2), FILLET_8_R, 90, 95.598737816)
            ThreePointArc((0.107335138, -2.195121951), (0.026849805, -1.098872287), (0, 0))
            Line((0, 0), (2.097794237, 0))
        make_face()
    extrude(amount=2)
    with BuildSketch(Plane(origin=(2, 7.5, 0), x_dir=(0, 1, 0), z_dir=(-1, 0, 0)), Plane(origin=(2, -0.653668071, 7.471460236), x_dir=(0, -0.08715574274765506, 0.9961946980917458), z_dir=(-1, 0, 0)), Plane(origin=(2, -7.244443697, 1.941142838), x_dir=(0, -0.9659258262890681, 0.25881904510252146), z_dir=(-1, 0, 0)), Plane(origin=(2, 2.565151075, 7.047694656), x_dir=(0, 0.3420201433256657, 0.9396926207859094), z_dir=(-1, 0, 0))) as fillet_8_piece_2:
        with BuildLine():
            CenterArc((1.787087811, -2), FILLET_8_R, 90, 77.846802531)
            ThreePointArc((-0.168088571, -1.578947368), (-0.042140531, -0.793934594), (0, 0))
            Line((0, 0), (1.787087811, 0))
        make_face()
    extrude(amount=2)
    with BuildSketch(Plane(origin=(2, 7.244443697, 1.941142838), x_dir=(0, 0.15511388497476047, -0.9878965951394088), z_dir=(-1, 0, 0)), Plane(origin=(2, -2.565151075, 7.047694656), x_dir=(0, 0.9706182844853172, 0.2406244913195247), z_dir=(-1, 0, 0)), Plane(origin=(2, -6.143640332, 4.301823273), x_dir=(0, 0.6570674137305863, 0.7538318206426409), z_dir=(-1, 0, 0)), Plane(origin=(2, -7.5, 0), x_dir=(0, 0.10585794590086138, 0.9943812625395002), z_dir=(-1, 0, 0)), Plane(origin=(2, 4.820907073, 5.745333323), x_dir=(0, 0.6936960644980776, -0.7202678460821911), z_dir=(-1, 0, 0)), Plane(origin=(2, 0.653668071, 7.471460236), x_dir=(0, 0.9813712137228957, -0.1921211619683022), z_dir=(-1, 0, 0))) as fillet_8_piece_3:
        with BuildLine():
            CenterArc((1.79958508, -1.988762525), FILLET_8_R, 96.076598735, 77.846802531)
            Line((-0.189177445, -1.777046633), (0, 0))
            ThreePointArc((0, 0), (0.793934594, -0.042140531), (1.587869189, 0))
        make_face()
    extrude(amount=2)
    with BuildSketch(Plane(origin=(2, -1.961004212, 22.414380707), x_dir=(0, 0.08715574274765493, -0.9961946980917459), z_dir=(-1, 0, 0)), Plane(origin=(2, -21.733331092, 5.823428515), x_dir=(0, 0.9659258262890682, -0.2588190451025213), z_dir=(-1, 0, 0)), Plane(origin=(2, 22.5, 0), x_dir=(0, -1, 0), z_dir=(-1, 0, 0))) as fillet_8_piece_4:
        with BuildLine():
            CenterArc((2.097794237, 2), FILLET_8_R, 174.401262184, 95.598737816)
            ThreePointArc((0.107335138, 2.195121951), (0.026849805, 1.098872287), (0, 0))
            Line((0, 0), (2.097794237, 0))
        make_face()
    extrude(amount=2)
    with BuildSketch(Plane(origin=(2, -14.462721218, 17.23599997), x_dir=(0, -0.7337373482538164, -0.6794332224563776), z_dir=(-1, 0, 0)), Plane(origin=(2, 18.430920997, 12.905469818), x_dir=(0, -0.6128983503496758, 0.7901617632729682), z_dir=(-1, 0, 0)), Plane(origin=(2, 7.695453225, 21.143083968), x_dir=(0, -0.9552751049492566, 0.29571857206504093), z_dir=(-1, 0, 0))) as fillet_8_piece_5:
        with BuildLine():
            CenterArc((2.100067037, -1.997613351), FILLET_8_R, 87.200631092, 95.598737816)
            Line((0.102453687, -2.095290887), (0, 0))
            ThreePointArc((0, 0), (1.098872287, 0.026849805), (2.197744574, 0))
        make_face()
    extrude(amount=2)
    with BuildSketch(Plane(origin=(2, -4.820907073, 5.745333323), x_dir=(0, -0.693696064498077, -0.7202678460821916), z_dir=(-1, 0, 0)), Plane(origin=(2, 6.143640332, 4.301823273), x_dir=(0, -0.6570674137305856, 0.7538318206426414), z_dir=(-1, 0, 0))) as fillet_8_piece_6:
        with BuildLine():
            CenterArc((1.79958508, 1.988762525), FILLET_8_R, 186.076598735, 77.846802531)
            Line((-0.189177445, 1.777046633), (0, 0))
            ThreePointArc((0, 0), (0.793934594, 0.042140531), (1.587869189, 0))
        make_face()
    extrude(amount=2)
    with BuildSketch(Plane(origin=(2, 1.961004212, 22.414380707), x_dir=(0, 0.9907493352683345, -0.1357046597039071), z_dir=(-1, 0, 0))) as fillet_8_piece_7:
        with BuildLine():
            CenterArc((2.100067037, 1.997613351), FILLET_8_R, 177.200631092, 95.598737816)
            Line((0.102453687, 2.095290887), (0, 0))
            ThreePointArc((0, 0), (1.098872287, -0.026849805), (2.197744574, 0))
        make_face()
    extrude(amount=2)

    # 圆角9
    fillet_9_edges = [part.edges().sort_by_distance(p)[0] for p in [
        (1, 12.365889233, -6.327248729),
    ]]
    fillet(fillet_9_edges, radius=FILLET_9_R)


solid = part.part
